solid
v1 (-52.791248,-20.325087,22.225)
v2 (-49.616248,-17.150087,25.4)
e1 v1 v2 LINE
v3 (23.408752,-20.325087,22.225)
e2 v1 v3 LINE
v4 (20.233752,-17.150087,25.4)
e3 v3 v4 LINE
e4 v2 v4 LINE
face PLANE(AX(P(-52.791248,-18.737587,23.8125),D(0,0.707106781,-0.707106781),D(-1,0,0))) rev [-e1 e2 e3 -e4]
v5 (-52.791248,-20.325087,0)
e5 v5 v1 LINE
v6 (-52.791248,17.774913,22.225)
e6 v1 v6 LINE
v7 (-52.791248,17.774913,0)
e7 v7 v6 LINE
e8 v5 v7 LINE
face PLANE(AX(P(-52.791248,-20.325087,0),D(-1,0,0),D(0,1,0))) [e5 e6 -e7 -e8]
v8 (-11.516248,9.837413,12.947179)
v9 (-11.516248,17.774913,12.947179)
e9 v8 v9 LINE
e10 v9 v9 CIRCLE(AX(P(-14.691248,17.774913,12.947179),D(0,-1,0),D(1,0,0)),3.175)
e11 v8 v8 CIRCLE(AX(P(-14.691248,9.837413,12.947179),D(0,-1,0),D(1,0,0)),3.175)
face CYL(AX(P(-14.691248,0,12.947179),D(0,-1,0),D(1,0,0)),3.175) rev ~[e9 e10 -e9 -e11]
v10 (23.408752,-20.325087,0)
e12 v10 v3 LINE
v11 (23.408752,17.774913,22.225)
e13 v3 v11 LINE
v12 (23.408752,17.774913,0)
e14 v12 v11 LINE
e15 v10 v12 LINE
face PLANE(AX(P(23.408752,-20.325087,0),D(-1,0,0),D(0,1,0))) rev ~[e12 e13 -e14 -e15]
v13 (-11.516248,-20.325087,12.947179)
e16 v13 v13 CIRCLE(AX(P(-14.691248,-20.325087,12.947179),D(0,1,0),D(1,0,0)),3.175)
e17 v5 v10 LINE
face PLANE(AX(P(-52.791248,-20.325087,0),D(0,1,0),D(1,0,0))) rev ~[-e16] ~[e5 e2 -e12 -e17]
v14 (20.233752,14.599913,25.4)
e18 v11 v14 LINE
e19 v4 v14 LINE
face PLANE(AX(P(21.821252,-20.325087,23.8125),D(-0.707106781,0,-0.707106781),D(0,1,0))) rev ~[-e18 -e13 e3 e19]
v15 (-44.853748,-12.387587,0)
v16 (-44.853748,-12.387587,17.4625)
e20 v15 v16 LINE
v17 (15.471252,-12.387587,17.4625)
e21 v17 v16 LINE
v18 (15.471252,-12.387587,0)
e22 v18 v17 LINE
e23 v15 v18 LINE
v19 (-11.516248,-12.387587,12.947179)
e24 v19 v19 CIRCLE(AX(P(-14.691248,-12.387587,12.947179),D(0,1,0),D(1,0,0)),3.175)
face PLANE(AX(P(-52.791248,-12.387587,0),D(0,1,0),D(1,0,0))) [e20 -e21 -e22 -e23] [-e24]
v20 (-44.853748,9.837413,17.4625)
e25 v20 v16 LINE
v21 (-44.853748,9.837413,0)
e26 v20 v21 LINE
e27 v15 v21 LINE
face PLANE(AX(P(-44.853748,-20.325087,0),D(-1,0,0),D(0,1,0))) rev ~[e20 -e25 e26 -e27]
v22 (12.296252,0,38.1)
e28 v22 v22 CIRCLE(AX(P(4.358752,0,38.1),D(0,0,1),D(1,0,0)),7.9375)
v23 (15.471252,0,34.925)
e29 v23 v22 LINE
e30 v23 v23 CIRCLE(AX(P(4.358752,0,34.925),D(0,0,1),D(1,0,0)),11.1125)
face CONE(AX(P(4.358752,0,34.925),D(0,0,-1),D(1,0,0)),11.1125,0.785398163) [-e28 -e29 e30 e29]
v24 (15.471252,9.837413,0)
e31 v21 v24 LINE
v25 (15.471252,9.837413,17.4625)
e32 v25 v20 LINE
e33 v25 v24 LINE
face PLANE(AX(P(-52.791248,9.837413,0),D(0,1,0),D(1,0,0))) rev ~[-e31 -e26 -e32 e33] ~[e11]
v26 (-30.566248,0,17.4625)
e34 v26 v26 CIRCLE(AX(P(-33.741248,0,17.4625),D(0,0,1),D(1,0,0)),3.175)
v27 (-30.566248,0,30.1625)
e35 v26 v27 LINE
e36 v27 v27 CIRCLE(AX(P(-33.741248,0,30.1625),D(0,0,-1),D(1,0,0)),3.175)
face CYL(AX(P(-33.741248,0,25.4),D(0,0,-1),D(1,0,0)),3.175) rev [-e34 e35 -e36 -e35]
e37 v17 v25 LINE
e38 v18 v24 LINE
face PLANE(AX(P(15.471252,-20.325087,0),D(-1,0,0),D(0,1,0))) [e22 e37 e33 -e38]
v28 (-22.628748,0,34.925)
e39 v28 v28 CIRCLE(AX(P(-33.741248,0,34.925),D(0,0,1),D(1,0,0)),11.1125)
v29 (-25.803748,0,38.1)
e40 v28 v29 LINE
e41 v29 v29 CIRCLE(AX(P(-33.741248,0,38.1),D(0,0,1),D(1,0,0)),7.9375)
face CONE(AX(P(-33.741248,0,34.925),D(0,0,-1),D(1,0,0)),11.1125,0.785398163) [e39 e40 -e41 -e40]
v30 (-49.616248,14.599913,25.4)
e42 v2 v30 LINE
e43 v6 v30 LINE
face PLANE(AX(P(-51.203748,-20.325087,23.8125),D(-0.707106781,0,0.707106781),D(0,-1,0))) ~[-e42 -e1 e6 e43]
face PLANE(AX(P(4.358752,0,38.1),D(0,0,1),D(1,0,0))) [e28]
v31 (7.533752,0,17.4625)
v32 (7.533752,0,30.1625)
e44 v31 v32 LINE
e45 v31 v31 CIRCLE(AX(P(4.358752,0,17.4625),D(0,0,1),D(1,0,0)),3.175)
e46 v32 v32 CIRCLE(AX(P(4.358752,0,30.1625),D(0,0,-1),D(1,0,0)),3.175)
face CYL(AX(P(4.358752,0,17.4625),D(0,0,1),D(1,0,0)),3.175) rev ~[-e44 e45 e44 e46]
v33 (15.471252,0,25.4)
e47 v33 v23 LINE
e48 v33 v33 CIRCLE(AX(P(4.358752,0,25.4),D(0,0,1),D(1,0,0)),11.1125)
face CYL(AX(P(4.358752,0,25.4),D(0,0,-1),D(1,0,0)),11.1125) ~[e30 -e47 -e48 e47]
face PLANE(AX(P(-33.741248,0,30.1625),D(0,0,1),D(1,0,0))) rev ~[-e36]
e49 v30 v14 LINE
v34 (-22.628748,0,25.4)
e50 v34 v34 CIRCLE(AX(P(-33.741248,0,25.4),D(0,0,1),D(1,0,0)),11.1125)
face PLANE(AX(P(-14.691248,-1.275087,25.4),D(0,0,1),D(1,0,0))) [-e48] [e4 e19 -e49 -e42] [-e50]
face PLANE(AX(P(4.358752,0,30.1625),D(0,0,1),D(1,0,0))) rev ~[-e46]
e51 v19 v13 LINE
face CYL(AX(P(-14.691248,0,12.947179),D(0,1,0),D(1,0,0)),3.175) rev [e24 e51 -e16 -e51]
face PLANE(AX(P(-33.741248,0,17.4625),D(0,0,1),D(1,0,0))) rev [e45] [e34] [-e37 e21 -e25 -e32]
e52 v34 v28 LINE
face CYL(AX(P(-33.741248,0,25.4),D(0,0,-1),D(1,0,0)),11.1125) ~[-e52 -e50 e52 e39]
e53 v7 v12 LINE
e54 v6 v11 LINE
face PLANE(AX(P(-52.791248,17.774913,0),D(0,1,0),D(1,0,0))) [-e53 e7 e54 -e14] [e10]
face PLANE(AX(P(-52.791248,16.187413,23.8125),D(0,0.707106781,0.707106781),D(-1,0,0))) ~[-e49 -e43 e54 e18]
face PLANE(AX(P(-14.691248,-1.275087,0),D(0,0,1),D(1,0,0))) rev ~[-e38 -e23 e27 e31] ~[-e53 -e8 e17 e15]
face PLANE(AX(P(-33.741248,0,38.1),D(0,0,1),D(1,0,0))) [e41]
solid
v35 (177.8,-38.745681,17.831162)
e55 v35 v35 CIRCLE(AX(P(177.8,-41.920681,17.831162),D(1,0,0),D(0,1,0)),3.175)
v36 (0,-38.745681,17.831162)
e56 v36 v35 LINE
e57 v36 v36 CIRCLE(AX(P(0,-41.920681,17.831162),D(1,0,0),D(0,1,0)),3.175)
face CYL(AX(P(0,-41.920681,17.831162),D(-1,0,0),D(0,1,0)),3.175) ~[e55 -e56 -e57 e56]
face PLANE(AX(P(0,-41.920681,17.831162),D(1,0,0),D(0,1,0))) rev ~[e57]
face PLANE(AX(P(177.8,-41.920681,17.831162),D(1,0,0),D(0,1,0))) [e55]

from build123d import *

# Parameters (mm, degrees)
F0_W          = 76.2
F0_H          = 38.1
F1_DEPTH      = 25.4
F2_R          = 11.1125
F3_DEPTH      = 12.7
F4_SIZE2      = 3.175
F4_SIZE       = 3.175
F5_SIZE       = 3.175
F6_T          = 7.9375
F7_R          = 3.175
F8_DEPTH      = 20.3260867754
F8_DEPTH_BACK = 17.7759132246
F9_R          = 3.175
F10_DEPTH     = 177.8


# Not quite as in the source:
# - a shell that OpenCascade refuses in one call is made with other operations: the cavity is built on its own and cut out


with BuildPart() as f1:
    # F0 (on Top) → F1 (new body)
    with BuildSketch(Plane.XY):
        with Locations((-14.6912483396, -1.2750867754)):
            Rectangle(F0_W, F0_H)
    extrude(amount=F1_DEPTH)

    # F2 (on face) → F3 (join)
    with BuildSketch(Plane.XY.offset(25.4)):
        with Locations((-33.7412483396, 0)):
            Circle(F2_R)
        with Locations((4.3587516604, 0)):
            Circle(F2_R)
    extrude(amount=F3_DEPTH)

    # F4
    f4_edges = [f1.edges().sort_by_distance(p)[0] for p in [
        (-14.691248, -20.325087, 25.4),
        (-52.791248, -1.275087, 25.4),
        (-14.691248, 17.774913, 25.4),
        (23.408752, -1.275087, 25.4),
    ]]
    chamfer(f4_edges, length=F4_SIZE, length2=F4_SIZE2)

    # F5
    f5_edges = [f1.edges().sort_by_distance(p)[0] for p in [
        (-44.853748, 0, 38.1),
        (-6.753748, 0, 38.1),
    ]]
    chamfer(f5_edges, length=F5_SIZE)

    # F6: shell of thickness 7.9375, made by hand


with BuildPart() as f6_core1:
    # F6_t2: copy of F1
    add(f1.part)

    # the walls: a layer under each face that stays
    f6_faces = [f6_core1.faces().sort_by_distance(p)[0] for p in [
        (-44.8537483396, 0, 30.1625),
        (-43.2662483396, 0, 36.5125),
        (-14.6912483396, -1.2750867754, 25.4),
        (-33.7412483396, 0, 38.1),
        (-14.6912483396, -18.7375867754, 23.8125),
        (-51.2037483396, -1.2750867754, 23.8125),
        (21.8212516604, -1.2750867754, 23.8125),
        (-14.6912483396, 16.1874132246, 23.8125),
        (-6.7537483396, 0, 30.1625),
        (-14.6912483396, -20.3250867754, 11.1125),
        (-52.7912483396, -1.2750867754, 11.1125),
        (23.4087516604, -1.2750867754, 11.1125),
        (-14.6912483396, 17.7749132246, 11.1125),
        (-5.1662483396, 0, 36.5125),
        (4.3587516604, 0, 38.1),
    ]]
    thicken(f6_faces, amount=-F6_T, mode=Mode.SUBTRACT)

    # F6_s3 → F6_t4 (revolve, cut)
    with BuildSketch(Plane.XZ):
        Polygon((-22.5493733396, 25.479375), (-30.5662483396, 25.4), (-30.5662483396, 17.4625), (-22.6287483396, 17.4625), align=None)
    revolve(axis=Axis((-33.7412483396, 0, 25.4), (0, 0, 1)), mode=Mode.SUBTRACT)

    # F6_s5 → F6_t6 (revolve, cut)
    with BuildSketch(Plane.XZ):
        Polygon((15.5506266604, 25.479375), (15.4712516604, 17.4625), (7.5337516604, 17.4625), (7.5337516604, 25.4), align=None)
    revolve(axis=Axis((4.3587516604, 0, 25.4), (0, 0, 1)), mode=Mode.SUBTRACT)


with BuildPart() as f1_1:
    add(f1.part)

    # what is left inside the walls is the cavity
    f6_cavity = [f6_core1.part.solids().sort_by_distance(p)[0] for p in [
        (-14.691248, -4.979253, 0.079375),
    ]]
    add(f6_cavity, mode=Mode.SUBTRACT)

    # F7 (on Front) → F8 (cut, two sides)
    with BuildSketch(Plane.XZ) as f8_sk:
        with Locations((-14.6912483396, 12.9471793771)):
            Circle(F7_R)
    extrude(amount=F8_DEPTH, mode=Mode.SUBTRACT)
    extrude(f8_sk.sketch, amount=-F8_DEPTH_BACK, mode=Mode.SUBTRACT)


with BuildPart() as f10:
    # F9 (on Right) → F10 (new body)
    with BuildSketch(Plane.YZ):
        with Locations((-41.9206805527, 17.8311616182)):
            Circle(F9_R)
    extrude(amount=F10_DEPTH)


solid = Compound([f1_1.part, f10.part])
